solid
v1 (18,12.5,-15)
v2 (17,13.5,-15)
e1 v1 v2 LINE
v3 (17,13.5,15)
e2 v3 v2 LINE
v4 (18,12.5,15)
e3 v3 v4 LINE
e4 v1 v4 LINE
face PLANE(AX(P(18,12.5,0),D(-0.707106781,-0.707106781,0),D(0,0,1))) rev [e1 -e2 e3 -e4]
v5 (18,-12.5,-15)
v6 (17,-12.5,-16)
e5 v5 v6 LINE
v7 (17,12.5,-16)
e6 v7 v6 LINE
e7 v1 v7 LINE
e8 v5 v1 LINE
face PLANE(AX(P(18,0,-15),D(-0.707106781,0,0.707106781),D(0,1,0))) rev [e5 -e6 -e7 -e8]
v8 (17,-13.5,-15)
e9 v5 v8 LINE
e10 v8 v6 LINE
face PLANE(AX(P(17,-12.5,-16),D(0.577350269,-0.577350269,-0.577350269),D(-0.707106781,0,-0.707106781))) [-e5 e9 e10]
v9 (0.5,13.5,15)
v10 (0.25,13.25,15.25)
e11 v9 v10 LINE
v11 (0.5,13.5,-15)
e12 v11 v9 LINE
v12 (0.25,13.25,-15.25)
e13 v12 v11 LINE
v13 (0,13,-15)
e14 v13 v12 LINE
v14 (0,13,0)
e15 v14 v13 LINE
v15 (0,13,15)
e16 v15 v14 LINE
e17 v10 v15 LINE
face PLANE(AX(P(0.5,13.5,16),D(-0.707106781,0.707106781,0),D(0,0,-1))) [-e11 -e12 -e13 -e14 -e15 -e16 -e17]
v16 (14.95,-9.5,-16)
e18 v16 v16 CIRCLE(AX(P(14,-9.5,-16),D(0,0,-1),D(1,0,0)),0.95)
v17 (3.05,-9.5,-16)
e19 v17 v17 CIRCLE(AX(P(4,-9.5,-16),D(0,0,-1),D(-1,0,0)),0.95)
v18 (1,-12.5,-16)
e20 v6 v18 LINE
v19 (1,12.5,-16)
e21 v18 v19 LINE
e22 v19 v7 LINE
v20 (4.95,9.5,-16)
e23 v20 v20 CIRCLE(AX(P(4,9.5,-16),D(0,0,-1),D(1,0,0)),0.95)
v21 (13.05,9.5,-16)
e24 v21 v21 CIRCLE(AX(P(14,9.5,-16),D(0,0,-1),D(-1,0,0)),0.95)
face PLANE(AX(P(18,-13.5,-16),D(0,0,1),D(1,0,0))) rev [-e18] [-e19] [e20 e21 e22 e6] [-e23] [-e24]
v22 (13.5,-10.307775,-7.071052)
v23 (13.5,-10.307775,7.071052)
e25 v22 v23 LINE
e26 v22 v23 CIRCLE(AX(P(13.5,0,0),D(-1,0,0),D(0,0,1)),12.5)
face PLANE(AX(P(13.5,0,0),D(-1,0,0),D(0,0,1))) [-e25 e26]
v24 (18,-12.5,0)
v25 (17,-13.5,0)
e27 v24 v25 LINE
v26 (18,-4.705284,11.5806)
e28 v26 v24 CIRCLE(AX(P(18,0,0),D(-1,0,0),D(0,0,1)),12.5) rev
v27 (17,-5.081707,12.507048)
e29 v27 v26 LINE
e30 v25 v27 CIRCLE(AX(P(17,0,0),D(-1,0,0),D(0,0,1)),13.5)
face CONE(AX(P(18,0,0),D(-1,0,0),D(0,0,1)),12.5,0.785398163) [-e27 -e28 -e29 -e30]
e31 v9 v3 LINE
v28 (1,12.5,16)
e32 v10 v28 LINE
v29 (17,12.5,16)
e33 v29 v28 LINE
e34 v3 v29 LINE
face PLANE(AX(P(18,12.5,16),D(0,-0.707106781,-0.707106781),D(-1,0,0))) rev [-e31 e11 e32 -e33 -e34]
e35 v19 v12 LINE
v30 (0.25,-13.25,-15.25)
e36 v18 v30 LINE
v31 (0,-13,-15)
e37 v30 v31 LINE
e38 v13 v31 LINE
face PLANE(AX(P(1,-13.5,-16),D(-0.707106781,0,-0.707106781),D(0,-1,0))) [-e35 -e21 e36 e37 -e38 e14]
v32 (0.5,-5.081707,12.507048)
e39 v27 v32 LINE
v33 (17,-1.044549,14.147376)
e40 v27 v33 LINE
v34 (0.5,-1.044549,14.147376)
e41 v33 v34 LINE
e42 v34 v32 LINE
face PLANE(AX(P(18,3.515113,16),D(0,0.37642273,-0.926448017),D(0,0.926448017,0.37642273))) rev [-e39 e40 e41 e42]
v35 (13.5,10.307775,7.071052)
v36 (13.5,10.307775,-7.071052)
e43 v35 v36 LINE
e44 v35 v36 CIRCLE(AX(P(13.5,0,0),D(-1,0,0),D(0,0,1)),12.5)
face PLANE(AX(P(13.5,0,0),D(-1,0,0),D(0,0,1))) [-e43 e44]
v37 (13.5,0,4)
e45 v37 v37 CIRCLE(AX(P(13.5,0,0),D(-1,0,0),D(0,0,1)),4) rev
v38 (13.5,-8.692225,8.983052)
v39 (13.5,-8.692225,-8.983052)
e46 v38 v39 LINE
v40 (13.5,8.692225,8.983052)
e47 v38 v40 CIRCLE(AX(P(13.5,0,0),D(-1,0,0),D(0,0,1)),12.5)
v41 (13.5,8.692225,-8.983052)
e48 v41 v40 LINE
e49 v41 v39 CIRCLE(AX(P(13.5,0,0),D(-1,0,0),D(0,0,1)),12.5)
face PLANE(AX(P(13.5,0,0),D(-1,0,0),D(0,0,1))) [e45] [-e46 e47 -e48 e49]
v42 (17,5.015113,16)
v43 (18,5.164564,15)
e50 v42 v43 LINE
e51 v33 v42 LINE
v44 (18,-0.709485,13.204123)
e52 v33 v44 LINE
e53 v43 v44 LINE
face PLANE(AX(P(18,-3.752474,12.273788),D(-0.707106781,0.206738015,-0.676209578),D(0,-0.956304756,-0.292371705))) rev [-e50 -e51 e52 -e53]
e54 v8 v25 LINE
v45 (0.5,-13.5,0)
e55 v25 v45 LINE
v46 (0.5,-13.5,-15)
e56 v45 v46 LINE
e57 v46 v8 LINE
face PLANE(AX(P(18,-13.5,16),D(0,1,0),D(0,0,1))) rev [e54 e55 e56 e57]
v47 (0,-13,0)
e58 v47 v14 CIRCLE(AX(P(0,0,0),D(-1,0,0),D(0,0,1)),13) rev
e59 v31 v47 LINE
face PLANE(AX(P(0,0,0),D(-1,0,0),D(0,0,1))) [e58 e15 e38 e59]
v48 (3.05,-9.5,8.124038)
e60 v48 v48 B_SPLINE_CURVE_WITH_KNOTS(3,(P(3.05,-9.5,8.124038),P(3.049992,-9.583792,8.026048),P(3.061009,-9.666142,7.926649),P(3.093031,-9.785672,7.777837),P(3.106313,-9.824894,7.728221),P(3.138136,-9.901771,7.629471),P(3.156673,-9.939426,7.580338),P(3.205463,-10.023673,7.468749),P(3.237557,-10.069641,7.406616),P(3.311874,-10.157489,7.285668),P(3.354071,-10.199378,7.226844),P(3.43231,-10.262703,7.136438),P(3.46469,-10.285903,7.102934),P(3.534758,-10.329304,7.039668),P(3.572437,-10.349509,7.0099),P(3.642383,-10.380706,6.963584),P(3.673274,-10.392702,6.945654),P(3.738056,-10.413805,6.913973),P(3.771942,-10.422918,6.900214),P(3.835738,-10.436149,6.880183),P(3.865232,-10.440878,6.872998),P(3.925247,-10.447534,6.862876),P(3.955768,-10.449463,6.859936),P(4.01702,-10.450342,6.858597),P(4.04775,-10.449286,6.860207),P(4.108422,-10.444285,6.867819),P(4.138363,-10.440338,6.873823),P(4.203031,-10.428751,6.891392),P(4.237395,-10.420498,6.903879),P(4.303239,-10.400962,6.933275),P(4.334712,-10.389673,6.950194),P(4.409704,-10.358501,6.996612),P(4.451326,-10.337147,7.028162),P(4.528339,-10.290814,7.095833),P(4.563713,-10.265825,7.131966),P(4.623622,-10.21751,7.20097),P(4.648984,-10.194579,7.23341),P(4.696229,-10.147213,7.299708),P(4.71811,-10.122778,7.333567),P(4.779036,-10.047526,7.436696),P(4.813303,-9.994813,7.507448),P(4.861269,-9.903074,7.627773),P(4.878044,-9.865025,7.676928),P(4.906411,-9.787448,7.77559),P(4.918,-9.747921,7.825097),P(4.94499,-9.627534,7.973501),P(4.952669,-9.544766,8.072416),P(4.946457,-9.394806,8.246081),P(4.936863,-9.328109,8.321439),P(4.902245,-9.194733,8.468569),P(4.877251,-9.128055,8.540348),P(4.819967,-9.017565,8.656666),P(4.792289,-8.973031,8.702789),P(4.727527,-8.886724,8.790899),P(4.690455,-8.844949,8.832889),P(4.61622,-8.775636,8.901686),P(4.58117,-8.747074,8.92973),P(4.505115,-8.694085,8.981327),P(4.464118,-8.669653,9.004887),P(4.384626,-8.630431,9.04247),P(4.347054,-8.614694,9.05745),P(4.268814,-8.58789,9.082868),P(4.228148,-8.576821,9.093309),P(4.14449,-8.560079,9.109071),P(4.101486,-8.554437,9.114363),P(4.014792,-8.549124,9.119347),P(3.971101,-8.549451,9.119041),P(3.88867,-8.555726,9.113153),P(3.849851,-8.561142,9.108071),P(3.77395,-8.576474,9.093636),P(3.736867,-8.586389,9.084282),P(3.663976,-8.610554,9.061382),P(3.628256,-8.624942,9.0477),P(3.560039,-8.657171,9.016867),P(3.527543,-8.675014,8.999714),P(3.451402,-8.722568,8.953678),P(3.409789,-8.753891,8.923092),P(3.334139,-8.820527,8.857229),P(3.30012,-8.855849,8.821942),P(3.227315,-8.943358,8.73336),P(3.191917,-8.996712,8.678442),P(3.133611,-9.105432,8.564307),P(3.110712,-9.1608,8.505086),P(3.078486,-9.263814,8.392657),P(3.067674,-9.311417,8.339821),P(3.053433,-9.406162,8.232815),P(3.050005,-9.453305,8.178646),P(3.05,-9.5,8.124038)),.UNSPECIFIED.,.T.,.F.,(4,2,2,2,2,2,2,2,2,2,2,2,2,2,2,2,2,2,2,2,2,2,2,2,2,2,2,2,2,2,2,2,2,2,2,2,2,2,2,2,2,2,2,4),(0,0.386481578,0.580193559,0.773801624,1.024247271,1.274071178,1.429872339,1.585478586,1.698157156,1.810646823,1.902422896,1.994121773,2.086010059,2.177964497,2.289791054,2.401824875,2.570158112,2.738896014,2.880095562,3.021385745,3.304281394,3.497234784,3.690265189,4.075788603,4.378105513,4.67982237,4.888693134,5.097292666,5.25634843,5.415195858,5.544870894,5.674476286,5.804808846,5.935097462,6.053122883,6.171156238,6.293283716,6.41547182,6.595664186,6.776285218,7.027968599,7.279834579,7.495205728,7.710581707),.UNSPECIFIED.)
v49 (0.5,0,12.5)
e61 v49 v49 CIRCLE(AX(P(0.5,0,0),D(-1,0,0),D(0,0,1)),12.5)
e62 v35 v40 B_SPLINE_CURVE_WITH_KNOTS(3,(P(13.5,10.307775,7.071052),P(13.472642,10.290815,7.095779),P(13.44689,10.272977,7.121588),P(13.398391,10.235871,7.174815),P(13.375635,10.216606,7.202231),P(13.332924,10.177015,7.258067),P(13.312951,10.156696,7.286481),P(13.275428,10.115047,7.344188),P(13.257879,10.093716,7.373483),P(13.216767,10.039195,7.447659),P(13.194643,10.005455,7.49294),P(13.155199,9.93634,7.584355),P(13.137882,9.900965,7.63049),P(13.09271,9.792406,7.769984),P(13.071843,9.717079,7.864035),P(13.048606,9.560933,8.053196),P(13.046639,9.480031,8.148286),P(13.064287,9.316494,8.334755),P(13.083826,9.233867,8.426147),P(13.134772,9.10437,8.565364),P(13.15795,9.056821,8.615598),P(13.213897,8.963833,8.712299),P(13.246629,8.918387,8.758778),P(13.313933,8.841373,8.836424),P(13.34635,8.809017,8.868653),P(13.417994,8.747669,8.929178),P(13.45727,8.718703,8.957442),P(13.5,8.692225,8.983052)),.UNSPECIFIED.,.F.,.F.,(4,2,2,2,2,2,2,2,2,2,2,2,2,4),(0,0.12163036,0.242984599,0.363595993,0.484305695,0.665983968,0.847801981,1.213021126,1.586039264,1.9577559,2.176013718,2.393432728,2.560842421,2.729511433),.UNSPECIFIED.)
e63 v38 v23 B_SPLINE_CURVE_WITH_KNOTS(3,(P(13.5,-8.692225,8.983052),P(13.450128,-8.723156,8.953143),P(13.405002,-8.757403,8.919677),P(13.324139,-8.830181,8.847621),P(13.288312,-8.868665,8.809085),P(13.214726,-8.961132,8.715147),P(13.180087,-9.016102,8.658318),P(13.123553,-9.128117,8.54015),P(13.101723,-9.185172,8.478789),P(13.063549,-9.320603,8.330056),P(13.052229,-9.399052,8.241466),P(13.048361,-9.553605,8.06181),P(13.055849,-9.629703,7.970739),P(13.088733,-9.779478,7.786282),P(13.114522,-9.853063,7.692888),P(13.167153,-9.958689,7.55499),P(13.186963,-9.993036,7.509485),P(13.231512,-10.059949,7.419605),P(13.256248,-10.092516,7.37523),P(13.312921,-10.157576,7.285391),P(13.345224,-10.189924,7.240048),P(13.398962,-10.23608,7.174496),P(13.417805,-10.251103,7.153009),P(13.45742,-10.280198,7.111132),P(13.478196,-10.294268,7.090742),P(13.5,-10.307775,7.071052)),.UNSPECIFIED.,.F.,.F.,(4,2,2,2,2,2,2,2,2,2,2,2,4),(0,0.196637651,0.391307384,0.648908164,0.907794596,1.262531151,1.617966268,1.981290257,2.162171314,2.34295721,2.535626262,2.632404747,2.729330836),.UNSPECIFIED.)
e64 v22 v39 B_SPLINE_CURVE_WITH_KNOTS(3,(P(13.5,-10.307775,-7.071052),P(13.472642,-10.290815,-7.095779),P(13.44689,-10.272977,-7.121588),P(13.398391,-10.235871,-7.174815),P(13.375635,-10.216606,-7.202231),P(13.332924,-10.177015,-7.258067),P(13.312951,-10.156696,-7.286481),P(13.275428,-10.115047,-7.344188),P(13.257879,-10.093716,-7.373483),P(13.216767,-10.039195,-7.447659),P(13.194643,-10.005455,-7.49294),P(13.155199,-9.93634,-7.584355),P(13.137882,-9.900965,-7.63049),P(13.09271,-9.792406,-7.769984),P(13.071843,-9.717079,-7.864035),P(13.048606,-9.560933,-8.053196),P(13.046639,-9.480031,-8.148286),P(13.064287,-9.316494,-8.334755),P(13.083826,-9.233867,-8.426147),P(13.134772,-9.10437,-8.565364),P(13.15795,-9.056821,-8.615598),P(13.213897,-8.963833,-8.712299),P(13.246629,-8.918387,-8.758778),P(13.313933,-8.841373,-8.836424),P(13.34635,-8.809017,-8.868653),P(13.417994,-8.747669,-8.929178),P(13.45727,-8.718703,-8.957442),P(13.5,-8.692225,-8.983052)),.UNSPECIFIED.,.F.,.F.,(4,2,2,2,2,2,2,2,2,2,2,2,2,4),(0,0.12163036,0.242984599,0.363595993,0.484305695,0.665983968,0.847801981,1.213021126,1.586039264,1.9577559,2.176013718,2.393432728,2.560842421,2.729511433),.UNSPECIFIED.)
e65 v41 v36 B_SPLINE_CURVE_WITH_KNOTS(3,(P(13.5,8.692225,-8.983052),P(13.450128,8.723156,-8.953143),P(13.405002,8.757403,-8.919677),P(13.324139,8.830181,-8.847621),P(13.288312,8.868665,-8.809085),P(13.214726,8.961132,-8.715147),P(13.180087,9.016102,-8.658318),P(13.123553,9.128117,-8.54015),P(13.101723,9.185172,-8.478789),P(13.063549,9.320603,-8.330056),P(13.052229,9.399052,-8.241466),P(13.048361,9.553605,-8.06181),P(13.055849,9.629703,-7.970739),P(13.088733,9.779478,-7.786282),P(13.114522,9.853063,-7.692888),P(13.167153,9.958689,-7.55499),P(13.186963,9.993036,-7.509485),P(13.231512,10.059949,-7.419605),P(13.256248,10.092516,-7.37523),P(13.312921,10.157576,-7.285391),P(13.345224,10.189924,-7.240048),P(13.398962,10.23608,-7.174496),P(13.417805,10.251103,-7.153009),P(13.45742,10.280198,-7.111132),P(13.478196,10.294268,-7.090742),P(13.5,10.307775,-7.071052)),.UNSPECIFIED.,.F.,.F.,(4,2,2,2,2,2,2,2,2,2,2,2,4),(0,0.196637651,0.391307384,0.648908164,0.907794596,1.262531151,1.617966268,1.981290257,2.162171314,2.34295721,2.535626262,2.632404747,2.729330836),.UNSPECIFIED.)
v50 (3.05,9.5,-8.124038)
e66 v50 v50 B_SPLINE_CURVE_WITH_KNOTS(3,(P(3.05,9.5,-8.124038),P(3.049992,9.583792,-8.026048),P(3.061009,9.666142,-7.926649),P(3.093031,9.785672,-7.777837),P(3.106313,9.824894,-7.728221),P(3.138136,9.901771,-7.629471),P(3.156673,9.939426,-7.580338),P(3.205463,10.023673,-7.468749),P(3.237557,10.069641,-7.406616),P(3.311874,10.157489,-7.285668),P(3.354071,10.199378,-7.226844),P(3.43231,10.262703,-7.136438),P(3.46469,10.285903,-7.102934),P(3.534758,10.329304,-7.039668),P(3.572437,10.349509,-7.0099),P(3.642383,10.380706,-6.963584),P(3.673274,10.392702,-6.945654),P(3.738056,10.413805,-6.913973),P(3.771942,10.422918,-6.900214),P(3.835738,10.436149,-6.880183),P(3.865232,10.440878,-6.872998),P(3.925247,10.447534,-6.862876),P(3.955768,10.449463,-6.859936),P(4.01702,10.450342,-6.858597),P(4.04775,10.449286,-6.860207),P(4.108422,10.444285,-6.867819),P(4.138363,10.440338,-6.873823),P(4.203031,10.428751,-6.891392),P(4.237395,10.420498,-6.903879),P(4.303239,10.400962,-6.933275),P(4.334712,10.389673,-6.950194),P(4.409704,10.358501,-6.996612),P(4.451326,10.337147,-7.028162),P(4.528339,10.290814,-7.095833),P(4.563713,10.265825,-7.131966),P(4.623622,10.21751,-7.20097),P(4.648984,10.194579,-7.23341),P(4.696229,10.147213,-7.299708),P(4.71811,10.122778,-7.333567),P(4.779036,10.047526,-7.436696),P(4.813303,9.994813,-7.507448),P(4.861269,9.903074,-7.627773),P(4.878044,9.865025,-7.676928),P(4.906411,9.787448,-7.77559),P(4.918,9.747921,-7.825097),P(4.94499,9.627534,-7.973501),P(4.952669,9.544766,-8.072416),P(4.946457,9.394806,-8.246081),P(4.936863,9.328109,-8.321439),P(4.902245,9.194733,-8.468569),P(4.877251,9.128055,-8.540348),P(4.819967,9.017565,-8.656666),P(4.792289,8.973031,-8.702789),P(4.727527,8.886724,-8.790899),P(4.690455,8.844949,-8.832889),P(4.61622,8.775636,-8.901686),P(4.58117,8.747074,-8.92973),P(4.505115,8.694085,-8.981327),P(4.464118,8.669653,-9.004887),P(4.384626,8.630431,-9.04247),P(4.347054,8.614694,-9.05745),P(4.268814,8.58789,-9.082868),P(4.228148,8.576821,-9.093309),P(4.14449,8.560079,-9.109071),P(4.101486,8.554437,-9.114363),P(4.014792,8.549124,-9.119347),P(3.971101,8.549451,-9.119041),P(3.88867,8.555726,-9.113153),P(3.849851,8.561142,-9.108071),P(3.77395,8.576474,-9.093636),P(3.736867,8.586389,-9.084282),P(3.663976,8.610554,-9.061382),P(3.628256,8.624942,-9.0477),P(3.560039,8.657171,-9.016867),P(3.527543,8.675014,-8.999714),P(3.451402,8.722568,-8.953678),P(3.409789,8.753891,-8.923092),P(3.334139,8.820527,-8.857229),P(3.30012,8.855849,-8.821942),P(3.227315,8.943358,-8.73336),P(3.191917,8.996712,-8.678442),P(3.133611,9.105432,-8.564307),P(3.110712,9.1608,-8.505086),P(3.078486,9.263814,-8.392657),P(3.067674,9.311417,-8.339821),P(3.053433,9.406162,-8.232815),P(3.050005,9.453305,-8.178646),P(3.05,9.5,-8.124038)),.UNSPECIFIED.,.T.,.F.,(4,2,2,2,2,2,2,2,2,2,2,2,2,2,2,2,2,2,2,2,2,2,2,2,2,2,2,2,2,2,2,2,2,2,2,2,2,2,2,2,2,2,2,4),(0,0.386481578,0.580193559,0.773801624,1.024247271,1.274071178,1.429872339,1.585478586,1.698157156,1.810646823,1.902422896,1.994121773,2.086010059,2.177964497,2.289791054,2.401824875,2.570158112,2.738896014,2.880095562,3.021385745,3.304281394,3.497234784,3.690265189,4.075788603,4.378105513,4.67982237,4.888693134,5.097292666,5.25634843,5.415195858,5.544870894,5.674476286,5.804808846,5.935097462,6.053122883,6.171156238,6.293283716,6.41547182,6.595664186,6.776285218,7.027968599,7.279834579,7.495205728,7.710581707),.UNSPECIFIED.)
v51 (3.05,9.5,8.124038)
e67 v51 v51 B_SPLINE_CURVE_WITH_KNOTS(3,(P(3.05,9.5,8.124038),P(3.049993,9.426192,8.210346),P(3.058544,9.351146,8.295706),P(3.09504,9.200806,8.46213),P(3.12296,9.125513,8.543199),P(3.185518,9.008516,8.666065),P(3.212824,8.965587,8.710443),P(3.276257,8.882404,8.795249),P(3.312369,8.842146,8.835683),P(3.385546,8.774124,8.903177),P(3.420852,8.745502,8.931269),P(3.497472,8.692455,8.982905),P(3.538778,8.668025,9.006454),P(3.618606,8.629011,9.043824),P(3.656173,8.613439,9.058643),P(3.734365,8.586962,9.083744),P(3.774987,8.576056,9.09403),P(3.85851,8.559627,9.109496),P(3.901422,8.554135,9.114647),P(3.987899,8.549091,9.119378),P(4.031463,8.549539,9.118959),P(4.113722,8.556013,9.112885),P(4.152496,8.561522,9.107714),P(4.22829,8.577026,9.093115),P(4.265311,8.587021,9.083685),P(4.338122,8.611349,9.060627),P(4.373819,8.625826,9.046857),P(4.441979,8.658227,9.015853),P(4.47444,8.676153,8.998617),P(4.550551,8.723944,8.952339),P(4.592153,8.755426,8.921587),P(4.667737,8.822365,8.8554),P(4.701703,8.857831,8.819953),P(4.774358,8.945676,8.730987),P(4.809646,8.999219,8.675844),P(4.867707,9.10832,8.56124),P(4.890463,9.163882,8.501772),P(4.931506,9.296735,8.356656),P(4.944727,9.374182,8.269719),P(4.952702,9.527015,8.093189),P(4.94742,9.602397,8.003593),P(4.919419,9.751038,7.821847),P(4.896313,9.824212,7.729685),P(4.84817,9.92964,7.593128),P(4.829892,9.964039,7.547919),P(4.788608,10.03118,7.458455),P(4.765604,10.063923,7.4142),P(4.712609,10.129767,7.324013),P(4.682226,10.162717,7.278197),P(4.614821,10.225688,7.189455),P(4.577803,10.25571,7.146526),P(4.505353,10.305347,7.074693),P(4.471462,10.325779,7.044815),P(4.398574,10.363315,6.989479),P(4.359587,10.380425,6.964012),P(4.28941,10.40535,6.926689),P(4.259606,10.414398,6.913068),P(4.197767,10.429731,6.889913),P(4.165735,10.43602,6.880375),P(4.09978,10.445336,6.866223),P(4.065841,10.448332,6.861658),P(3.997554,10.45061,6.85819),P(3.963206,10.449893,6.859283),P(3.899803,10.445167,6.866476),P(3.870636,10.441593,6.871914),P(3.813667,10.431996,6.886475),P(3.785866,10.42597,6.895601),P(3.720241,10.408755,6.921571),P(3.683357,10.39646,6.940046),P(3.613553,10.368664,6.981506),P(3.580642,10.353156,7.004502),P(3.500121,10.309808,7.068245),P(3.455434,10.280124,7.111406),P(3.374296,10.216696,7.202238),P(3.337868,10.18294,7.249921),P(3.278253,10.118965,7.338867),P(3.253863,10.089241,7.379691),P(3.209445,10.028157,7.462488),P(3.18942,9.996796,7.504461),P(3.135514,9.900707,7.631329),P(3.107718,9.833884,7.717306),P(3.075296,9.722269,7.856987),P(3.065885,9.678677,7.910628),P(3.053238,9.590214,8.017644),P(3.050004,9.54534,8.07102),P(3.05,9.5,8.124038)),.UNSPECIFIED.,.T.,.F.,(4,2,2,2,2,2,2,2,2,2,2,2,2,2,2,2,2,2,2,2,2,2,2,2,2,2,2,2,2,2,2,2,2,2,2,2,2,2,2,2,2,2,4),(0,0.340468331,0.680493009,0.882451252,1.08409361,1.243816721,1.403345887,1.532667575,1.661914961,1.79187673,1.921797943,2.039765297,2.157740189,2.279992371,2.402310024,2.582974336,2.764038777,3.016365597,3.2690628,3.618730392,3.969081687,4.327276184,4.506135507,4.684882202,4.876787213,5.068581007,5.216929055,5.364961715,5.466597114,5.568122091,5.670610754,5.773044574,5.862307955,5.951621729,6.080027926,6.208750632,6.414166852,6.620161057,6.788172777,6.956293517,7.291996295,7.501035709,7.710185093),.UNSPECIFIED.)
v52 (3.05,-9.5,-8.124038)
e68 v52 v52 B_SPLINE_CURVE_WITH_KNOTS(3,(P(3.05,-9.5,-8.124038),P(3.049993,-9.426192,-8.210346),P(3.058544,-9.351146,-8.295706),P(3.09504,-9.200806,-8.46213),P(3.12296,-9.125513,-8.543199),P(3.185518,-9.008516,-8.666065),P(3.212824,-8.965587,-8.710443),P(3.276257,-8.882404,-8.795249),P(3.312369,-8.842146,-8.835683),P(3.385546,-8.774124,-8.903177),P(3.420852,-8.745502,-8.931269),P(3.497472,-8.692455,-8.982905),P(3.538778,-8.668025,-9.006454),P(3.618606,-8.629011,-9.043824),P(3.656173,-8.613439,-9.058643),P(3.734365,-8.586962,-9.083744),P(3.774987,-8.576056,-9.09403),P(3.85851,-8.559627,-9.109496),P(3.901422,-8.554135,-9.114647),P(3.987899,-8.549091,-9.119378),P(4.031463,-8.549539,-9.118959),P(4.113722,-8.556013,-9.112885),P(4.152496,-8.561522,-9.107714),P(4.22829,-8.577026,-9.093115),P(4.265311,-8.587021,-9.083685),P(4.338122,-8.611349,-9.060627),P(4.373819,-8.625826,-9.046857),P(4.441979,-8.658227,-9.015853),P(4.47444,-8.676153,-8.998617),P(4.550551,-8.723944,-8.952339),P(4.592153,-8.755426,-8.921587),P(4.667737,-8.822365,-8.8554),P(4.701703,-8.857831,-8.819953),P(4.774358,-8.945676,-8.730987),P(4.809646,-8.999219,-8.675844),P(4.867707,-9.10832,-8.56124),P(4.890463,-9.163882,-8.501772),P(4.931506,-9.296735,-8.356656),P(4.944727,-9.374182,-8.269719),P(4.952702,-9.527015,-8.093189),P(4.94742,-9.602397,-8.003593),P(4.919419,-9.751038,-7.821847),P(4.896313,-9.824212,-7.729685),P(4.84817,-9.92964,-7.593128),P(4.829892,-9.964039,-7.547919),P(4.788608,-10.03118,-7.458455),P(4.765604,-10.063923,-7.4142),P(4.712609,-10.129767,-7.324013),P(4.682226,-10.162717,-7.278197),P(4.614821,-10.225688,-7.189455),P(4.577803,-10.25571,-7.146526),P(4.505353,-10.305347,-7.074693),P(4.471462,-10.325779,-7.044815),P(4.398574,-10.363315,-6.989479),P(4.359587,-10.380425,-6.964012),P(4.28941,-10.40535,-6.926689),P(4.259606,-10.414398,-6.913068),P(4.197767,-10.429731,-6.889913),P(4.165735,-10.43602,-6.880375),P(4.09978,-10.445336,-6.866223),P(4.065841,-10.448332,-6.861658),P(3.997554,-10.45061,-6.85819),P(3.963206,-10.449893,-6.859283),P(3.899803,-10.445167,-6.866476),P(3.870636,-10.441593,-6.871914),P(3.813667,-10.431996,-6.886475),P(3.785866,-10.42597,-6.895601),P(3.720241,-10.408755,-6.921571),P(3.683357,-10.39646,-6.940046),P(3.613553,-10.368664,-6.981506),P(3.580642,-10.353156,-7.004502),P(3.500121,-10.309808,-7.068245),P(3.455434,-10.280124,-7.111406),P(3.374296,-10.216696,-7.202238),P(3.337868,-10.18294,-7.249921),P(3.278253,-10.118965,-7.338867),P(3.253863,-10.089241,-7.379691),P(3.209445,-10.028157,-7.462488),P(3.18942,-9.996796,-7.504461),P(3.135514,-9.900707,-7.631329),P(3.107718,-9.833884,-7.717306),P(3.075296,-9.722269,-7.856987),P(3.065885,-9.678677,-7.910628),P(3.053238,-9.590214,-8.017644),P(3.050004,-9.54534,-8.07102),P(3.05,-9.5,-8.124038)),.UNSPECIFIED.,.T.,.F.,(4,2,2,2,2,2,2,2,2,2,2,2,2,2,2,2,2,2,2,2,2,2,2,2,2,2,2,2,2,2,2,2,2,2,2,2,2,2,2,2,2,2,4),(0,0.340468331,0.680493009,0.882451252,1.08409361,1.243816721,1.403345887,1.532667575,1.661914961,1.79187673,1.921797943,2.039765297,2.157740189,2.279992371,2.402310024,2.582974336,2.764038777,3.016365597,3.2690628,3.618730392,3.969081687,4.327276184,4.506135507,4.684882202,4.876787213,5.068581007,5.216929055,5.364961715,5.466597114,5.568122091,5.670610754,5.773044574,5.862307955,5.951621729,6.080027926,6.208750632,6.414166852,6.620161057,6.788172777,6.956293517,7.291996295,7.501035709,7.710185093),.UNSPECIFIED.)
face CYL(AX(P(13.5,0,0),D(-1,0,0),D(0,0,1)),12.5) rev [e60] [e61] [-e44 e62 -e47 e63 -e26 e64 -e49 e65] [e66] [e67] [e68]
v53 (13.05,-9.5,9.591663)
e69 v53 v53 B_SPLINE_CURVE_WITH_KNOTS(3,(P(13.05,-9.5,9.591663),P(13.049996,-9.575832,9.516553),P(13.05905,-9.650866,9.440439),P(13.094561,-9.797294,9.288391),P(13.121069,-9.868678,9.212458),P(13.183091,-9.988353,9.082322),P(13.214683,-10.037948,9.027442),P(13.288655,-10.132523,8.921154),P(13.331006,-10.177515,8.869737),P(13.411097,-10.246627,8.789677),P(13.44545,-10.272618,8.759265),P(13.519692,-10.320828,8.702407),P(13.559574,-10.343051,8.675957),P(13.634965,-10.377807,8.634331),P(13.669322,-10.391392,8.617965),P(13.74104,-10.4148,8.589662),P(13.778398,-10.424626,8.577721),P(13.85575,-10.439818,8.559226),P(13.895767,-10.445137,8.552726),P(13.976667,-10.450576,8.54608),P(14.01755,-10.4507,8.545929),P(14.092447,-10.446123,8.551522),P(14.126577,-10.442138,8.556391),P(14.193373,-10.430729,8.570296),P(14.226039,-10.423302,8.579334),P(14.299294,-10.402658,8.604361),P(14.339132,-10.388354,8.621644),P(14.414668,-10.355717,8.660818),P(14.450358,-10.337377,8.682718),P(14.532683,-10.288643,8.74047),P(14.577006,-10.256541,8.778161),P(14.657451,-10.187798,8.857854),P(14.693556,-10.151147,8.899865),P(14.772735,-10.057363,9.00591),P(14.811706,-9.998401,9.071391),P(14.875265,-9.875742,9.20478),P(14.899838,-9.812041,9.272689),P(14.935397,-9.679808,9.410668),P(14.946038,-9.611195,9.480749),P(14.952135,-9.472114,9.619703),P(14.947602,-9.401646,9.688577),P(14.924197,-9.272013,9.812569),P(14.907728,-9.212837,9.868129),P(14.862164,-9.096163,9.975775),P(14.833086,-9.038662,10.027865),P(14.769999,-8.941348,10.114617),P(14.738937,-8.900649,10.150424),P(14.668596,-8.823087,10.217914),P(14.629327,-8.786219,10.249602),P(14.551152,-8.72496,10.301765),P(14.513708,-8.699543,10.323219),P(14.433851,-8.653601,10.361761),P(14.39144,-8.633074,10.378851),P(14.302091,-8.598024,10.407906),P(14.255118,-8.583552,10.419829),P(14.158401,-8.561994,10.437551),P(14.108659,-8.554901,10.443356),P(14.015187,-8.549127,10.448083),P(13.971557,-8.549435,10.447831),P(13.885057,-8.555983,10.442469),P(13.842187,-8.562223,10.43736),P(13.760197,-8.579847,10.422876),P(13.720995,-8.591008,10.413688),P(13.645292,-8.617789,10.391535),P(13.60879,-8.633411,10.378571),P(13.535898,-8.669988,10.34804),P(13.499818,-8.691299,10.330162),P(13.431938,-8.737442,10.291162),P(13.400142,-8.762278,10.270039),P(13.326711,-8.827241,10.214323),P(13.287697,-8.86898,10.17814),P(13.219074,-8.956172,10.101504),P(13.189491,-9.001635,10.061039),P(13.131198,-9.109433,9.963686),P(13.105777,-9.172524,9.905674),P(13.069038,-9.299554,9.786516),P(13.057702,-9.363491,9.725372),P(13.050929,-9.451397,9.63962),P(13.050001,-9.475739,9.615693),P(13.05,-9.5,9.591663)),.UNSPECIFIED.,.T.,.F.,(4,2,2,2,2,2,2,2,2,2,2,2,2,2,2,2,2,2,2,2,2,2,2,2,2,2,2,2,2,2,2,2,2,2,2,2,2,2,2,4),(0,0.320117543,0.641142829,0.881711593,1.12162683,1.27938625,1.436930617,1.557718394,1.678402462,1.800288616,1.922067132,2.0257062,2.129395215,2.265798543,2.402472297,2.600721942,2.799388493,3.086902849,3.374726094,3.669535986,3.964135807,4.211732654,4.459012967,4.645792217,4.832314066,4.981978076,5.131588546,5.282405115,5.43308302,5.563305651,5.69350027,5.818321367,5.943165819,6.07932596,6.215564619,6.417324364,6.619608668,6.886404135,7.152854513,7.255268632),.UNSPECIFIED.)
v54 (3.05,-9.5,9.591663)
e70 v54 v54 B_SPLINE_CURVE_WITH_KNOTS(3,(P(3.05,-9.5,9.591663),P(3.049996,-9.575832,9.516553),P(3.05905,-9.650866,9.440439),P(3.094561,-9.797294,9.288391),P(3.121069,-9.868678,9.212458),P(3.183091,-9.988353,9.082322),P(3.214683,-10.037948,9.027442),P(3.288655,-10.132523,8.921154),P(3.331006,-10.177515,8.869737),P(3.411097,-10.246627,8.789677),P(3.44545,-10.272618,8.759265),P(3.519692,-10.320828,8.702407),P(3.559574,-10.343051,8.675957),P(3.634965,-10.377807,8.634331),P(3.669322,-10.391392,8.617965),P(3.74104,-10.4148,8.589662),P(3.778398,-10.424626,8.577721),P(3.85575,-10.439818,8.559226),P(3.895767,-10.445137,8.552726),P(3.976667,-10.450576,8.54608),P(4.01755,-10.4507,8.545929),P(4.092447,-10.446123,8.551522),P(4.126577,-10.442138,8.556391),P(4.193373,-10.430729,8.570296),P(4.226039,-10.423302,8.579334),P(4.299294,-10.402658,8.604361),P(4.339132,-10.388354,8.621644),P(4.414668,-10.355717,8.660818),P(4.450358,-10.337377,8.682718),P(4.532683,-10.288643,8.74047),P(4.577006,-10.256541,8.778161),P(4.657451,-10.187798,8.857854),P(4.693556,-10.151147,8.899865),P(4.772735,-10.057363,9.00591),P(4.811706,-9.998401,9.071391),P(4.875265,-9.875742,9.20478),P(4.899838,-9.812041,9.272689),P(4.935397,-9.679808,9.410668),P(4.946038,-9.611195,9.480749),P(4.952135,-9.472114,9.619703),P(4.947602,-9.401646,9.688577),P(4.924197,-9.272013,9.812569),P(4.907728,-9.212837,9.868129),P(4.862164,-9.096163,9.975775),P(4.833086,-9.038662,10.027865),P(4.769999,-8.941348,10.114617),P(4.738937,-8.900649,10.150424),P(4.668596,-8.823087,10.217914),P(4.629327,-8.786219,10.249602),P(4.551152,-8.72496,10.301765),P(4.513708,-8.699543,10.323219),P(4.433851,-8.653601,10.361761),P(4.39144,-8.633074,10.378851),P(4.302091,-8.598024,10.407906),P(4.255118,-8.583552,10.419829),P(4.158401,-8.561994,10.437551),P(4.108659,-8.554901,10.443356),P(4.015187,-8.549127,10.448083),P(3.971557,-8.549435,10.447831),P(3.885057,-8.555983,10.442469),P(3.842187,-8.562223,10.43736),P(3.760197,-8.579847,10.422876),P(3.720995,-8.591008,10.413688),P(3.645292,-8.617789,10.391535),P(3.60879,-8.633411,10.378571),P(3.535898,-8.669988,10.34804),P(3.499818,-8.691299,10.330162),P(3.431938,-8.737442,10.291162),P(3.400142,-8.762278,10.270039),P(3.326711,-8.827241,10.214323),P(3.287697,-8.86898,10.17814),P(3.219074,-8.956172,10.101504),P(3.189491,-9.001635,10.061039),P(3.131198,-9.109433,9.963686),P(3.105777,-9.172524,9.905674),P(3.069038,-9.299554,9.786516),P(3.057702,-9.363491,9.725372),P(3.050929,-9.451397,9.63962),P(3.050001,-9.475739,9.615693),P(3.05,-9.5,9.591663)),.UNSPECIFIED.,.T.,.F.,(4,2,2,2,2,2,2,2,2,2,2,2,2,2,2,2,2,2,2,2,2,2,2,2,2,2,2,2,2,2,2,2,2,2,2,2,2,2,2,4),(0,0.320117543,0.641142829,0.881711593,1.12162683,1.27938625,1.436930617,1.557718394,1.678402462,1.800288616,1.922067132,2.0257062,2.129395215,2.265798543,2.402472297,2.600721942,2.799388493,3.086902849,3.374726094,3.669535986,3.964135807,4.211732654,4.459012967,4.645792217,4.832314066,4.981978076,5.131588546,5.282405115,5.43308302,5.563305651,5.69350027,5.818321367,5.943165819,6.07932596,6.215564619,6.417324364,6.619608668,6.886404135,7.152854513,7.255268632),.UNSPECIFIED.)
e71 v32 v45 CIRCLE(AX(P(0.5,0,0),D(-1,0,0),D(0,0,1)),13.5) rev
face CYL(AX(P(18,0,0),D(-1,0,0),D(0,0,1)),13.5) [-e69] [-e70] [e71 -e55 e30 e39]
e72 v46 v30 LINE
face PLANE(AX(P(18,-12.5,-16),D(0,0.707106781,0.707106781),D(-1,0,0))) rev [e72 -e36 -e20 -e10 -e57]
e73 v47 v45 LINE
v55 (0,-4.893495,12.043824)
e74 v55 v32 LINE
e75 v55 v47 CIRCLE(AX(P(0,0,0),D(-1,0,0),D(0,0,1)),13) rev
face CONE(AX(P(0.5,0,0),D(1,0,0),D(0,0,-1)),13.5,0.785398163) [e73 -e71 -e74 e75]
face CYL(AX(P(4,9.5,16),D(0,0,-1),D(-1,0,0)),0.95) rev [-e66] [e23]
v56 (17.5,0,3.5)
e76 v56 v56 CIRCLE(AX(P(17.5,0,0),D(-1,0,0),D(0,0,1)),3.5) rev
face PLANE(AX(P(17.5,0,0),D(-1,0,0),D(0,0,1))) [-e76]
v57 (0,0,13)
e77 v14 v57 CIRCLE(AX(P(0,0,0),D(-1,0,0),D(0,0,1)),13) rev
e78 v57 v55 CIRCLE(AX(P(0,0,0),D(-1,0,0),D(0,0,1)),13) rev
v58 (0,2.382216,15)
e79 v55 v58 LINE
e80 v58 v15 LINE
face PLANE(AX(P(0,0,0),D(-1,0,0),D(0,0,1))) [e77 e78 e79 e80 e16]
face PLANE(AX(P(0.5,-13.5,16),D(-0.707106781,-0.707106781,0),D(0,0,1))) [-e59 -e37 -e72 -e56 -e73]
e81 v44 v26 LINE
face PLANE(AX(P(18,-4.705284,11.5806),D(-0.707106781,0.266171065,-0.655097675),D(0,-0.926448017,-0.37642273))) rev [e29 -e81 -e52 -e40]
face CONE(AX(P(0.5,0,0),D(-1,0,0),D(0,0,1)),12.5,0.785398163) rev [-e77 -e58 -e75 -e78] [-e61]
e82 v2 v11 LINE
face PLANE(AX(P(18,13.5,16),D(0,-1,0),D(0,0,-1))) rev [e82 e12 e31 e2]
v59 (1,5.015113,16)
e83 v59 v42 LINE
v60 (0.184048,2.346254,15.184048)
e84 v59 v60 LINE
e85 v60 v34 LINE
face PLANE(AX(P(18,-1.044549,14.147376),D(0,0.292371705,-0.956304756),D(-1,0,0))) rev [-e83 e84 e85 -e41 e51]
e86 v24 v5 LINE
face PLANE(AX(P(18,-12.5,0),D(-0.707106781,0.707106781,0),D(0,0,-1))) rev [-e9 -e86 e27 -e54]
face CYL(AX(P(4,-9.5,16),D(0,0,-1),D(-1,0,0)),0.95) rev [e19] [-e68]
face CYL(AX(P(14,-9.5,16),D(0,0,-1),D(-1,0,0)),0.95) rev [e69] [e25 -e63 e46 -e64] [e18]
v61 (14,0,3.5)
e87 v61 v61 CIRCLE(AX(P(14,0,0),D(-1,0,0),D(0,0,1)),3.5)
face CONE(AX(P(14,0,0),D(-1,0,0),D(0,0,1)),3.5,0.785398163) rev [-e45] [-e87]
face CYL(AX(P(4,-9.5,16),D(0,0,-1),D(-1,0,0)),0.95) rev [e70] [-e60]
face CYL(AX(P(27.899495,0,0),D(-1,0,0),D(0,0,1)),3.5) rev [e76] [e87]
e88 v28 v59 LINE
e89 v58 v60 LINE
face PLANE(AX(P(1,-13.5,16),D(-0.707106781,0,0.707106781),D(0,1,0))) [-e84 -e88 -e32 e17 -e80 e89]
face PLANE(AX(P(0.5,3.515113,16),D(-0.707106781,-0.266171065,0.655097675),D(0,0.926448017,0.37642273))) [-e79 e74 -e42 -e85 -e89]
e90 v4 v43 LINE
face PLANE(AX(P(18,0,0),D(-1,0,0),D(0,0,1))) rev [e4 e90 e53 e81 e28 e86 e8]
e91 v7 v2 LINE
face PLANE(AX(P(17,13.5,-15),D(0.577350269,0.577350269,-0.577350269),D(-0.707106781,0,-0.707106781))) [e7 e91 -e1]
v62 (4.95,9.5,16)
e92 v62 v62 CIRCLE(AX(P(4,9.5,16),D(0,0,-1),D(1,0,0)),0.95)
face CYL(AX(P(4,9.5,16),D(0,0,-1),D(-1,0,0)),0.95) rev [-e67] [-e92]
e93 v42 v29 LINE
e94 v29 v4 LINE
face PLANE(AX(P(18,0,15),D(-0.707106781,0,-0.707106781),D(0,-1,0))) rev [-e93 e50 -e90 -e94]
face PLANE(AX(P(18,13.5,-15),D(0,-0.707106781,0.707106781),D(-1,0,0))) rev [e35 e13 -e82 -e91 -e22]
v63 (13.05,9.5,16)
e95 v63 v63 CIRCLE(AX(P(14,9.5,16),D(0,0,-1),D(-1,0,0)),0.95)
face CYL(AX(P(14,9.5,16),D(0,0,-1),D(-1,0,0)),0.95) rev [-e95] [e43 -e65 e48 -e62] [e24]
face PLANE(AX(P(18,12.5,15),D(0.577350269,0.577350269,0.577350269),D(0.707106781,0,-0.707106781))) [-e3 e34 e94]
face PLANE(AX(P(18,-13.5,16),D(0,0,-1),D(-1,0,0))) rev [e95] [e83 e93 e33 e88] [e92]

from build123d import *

# Parameters (mm, degrees)
SKETCH_1_W          = 32
SKETCH_1_H          = 27
EXTRUDE_1_DEPTH     = 18
SKETCH_2_R          = 12.5
CUT_EXTRUDE_1_DEPTH = 13.5
SKETCH_3_R          = 3.5
CUT_EXTRUDE_2_DEPTH = 4
SKETCH_4_R          = 0.95
CUT_EXTRUDE_3_DEPTH = 40.118409988
CUT_EXTRUDE_4_DEPTH = 28.608875443
CHAMFER_2_SIZE      = 1.5
CHAMFER_2_SIZE2     = 4.921659428
CHAMFER_4_SIZE      = 0.5


with BuildPart() as part:
    # 草图1 → 凸台-拉伸1 (new body)
    with BuildSketch(Plane(origin=(0, 0, 0), x_dir=(0, 0, -1), z_dir=(1, 0, 0))):
        Rectangle(SKETCH_1_W, SKETCH_1_H)
    extrude(amount=EXTRUDE_1_DEPTH)

    # 草图2 → 切除-拉伸1 (cut)
    with BuildSketch(Plane.ZY):
        Circle(SKETCH_2_R)
    extrude(amount=-CUT_EXTRUDE_1_DEPTH, mode=Mode.SUBTRACT)

    # 草图3 → 切除-拉伸2 (cut)
    with BuildSketch(Plane.ZY.offset(-13.5)):
        Circle(SKETCH_3_R)
    extrude(amount=-CUT_EXTRUDE_2_DEPTH, mode=Mode.SUBTRACT)

    # 草图4 → 切除-拉伸3 (cut, through all)
    with BuildSketch(Plane(origin=(0, 0, -16), x_dir=(-1, 0, 0), z_dir=(0, 0, -1))):
        with Locations((-14, 9.5)):
            Circle(SKETCH_4_R)
        with Locations((-4, 9.5)):
            Circle(SKETCH_4_R)
        with Locations((-4, -9.5)):
            Circle(SKETCH_4_R)
        with Locations(Location((-14, -9.5, 0), (0, 0, 180))):
            Circle(SKETCH_4_R)
    extrude(amount=-CUT_EXTRUDE_3_DEPTH, mode=Mode.SUBTRACT)

    # 草图6 → 切除-拉伸4 (cut, through all)
    with BuildSketch(Plane.ZY):
        with BuildLine():
            Line((16, -13.5), (16, 3.515112589))
            Line((16, 3.515112589), (12.507048233, -5.08170685))
            ThreePointArc((12.507048233, -5.08170685), (7.538134966, -11.199398253), (0, -13.5))
            Line((0, -13.5), (16, -13.5))
        make_face()
    extrude(amount=-CUT_EXTRUDE_4_DEPTH, mode=Mode.SUBTRACT)

    # 倒角2
    chamfer_2_edges = [part.edges().sort_by_distance(p)[0] for p in [
        (9, 3.515112589, 16),
    ]]
    chamfer_2_side = [part.faces().sort_by_distance(p)[0] for p in [
        (9, 8.475223706, 16),
    ]]
    chamfer(chamfer_2_edges, length=CHAMFER_2_SIZE, length2=CHAMFER_2_SIZE2, reference=chamfer_2_side[0])

    # 倒角3
    # the kernel refuses this chamfer: 1 mm, written as the material it takes off along each edge
    with BuildSketch(Plane(origin=(17.333333333, 12.833333333, 15.333333333), x_dir=(-0.7071067811865475, 0, 0.7071067811865475), z_dir=(0.5773502691896258, 0.5773502691896258, 0.5773502691896258)), Plane(origin=(17.333333333, 12.833333333, -15.333333333), x_dir=(-0.7071067811865475, 0.7071067811865475, 0), z_dir=(0.5773502691896258, 0.5773502691896258, -0.5773502691896258))) as chamfer_3_piece_1:
        Polygon((-0.707106781, 0.40824829), (0.707106781, 0.40824829), (0, -0.816496581), align=None)
    extrude(amount=1.270170592, mode=Mode.SUBTRACT)
    with BuildSketch(Plane(origin=(17.333333333, -12.833333333, -15.333333333), x_dir=(-0.7071067811865475, -0.7071067811865475, 0), z_dir=(0.5773502691896258, -0.5773502691896258, -0.5773502691896258))) as chamfer_3_piece_2:
        Polygon((-0.707106781, -0.40824829), (0.707106781, -0.40824829), (0, 0.816496581), align=None)
    extrude(amount=1.270170592, mode=Mode.SUBTRACT)
    with BuildSketch(Plane(origin=(18, 16.071682988, 16), x_dir=(-1, 0, 0), z_dir=(0, -1, 0)), Plane(origin=(0, 16.071682988, 16), x_dir=(0, 0, -1), z_dir=(0, -1, 0))) as chamfer_3_piece_3:
        with BuildLine():
            Line((1.028284271, -0.028284271), (-0.028284271, 1.028284271))
            Line((-0.028284271, 1.028284271), (-0.048284271, 1.028284271))
            ThreePointArc((-0.048284271, 1.028284271), (-0.02, 0.514142136), (-0.02, 0))
            Line((-0.02, 0), (0, -0.02))
            ThreePointArc((0, -0.02), (0.514142136, -0.02), (1.028284271, -0.048284271))
            Line((1.028284271, -0.048284271), (1.028284271, -0.028284271))
        make_face()
    extrude(amount=15.428431478, mode=Mode.SUBTRACT)
    with BuildSketch(Plane(origin=(18, -16.071682988, -16), x_dir=(-1, 0, 0), z_dir=(0, 1, 0)), Plane(origin=(0, -16.071682988, -16), x_dir=(0, 0, 1), z_dir=(0, 1, 0))) as chamfer_3_piece_4:
        with BuildLine():
            Line((1.028284271, -0.028284271), (-0.028284271, 1.028284271))
            Line((-0.028284271, 1.028284271), (-0.048284271, 1.028284271))
            ThreePointArc((-0.048284271, 1.028284271), (-0.02, 0.514142136), (-0.02, 0))
            Line((-0.02, 0), (0, -0.02))
            ThreePointArc((0, -0.02), (0.514142136, -0.02), (1.028284271, -0.048284271))
            Line((1.028284271, -0.048284271), (1.028284271, -0.028284271))
        make_face()
    extrude(amount=32.143365976, mode=Mode.SUBTRACT)
    with BuildSketch(Plane(origin=(18, -13.5, 0), x_dir=(-1, 0, 0), z_dir=(0, 0, -1))) as chamfer_3_piece_5:
        with BuildLine():
            Line((1.028284271, -0.028284271), (-0.028284271, 1.028284271))
            Line((-0.028284271, 1.028284271), (-0.048284271, 1.028284271))
            ThreePointArc((-0.048284271, 1.028284271), (-0.02, 0.514142136), (-0.02, 0))
            Line((-0.02, 0), (0, -0.02))
            ThreePointArc((0, -0.02), (0.514142136, -0.02), (1.028284271, -0.048284271))
            Line((1.028284271, -0.048284271), (1.028284271, -0.028284271))
        make_face()
    extrude(amount=18.571682988, mode=Mode.SUBTRACT)
    with BuildSketch(Plane(origin=(18, 0, 0), x_dir=(0, -1, 0), z_dir=(0, 0, -1))) as chamfer_3_piece_6:
        with BuildLine():
            Line((13.528284271, 1.028284271), (12.471715729, -0.028284271))
            Line((12.471715729, -0.028284271), (12.471715729, -0.048284271))
            ThreePointArc((12.471715729, -0.048284271), (12.985857864, -0.02), (13.5, -0.02))
            Line((13.5, -0.02), (13.52, 0))
            ThreePointArc((13.52, 0), (13.52, 0.514142136), (13.548284271, 1.028284271))
            Line((13.548284271, 1.028284271), (13.528284271, 1.028284271))
        make_face()
    revolve(axis=Axis((18, 0, 0), (-1, 0, 0)), revolution_arc=67.887726461, mode=Mode.SUBTRACT)
    with BuildSketch(Plane(origin=(18, -5.08170685, 12.507048233), x_dir=(-1, 0, 0), z_dir=(0, 0.9264480172326814, 0.3764227296081273))) as chamfer_3_piece_7:
        with BuildLine():
            Line((1.028284271, 0.028284271), (-0.028284271, -1.028284271))
            Line((-0.028284271, -1.028284271), (-0.048284271, -1.028284271))
            ThreePointArc((-0.048284271, -1.028284271), (-0.02, -0.514142136), (-0.02, 0))
            Line((-0.02, 0), (0, 0.02))
            ThreePointArc((0, 0.02), (0.514142136, 0.02), (1.028284271, 0.048284271))
            Line((1.028284271, 0.048284271), (1.028284271, 0.028284271))
        make_face()
    extrude(amount=17.216088275, mode=Mode.SUBTRACT)
    with BuildSketch(Plane(origin=(18, 9.195944132, 17.278208477), x_dir=(-1, 0, 0), z_dir=(0, -0.9563047559630353, -0.2923717047227372))) as chamfer_3_piece_8:
        with BuildLine():
            Line((1.028284271, -0.028284271), (-0.028284271, 1.028284271))
            Line((-0.028284271, 1.028284271), (-0.048284271, 1.028284271))
            ThreePointArc((-0.048284271, 1.028284271), (-0.02, 0.514142136), (-0.02, 0))
            Line((-0.02, 0), (0, -0.02))
            ThreePointArc((0, -0.02), (0.514142136, -0.02), (1.028284271, -0.048284271))
            Line((1.028284271, -0.048284271), (1.028284271, -0.028284271))
        make_face()
    extrude(amount=23.566814221, mode=Mode.SUBTRACT)
    with BuildSketch(Plane(origin=(-2.571682988, -13.5, -16), x_dir=(0, 0, 1), z_dir=(1, 0, 0))) as chamfer_3_piece_9:
        with BuildLine():
            Line((1.028284271, 0.028284271), (-0.028284271, -1.028284271))
            Line((-0.028284271, -1.028284271), (-0.048284271, -1.028284271))
            ThreePointArc((-0.048284271, -1.028284271), (-0.02, -0.514142136), (-0.02, 0))
            Line((-0.02, 0), (0, 0.02))
            ThreePointArc((0, 0.02), (0.514142136, 0.02), (1.028284271, 0.048284271))
            Line((1.028284271, 0.048284271), (1.028284271, 0.028284271))
        make_face()
    extrude(amount=23.143365976, mode=Mode.SUBTRACT)
    with BuildSketch(Plane(origin=(-2.571682988, 13.5, 16), x_dir=(0, -1, 0), z_dir=(1, 0, 0)), Plane(origin=(-2.571682988, 13.5, -16), x_dir=(0, 0, 1), z_dir=(1, 0, 0))) as chamfer_3_piece_10:
        with BuildLine():
            Line((1.028284271, -0.028284271), (-0.028284271, 1.028284271))
            Line((-0.028284271, 1.028284271), (-0.048284271, 1.028284271))
            ThreePointArc((-0.048284271, 1.028284271), (-0.02, 0.514142136), (-0.02, 0))
            Line((-0.02, 0), (0, -0.02))
            ThreePointArc((0, -0.02), (0.514142136, -0.02), (1.028284271, -0.048284271))
            Line((1.028284271, -0.048284271), (1.028284271, -0.028284271))
        make_face()
    extrude(amount=23.143365976, mode=Mode.SUBTRACT)
    with BuildSketch(Plane(origin=(18, 13.5, -18.571682988), x_dir=(-1, 0, 0), z_dir=(0, 0, 1))) as chamfer_3_piece_11:
        with BuildLine():
            Line((1.028284271, -0.028284271), (-0.028284271, 1.028284271))
            Line((-0.028284271, 1.028284271), (-0.048284271, 1.028284271))
            ThreePointArc((-0.048284271, 1.028284271), (-0.02, 0.514142136), (-0.02, 0))
            Line((-0.02, 0), (0, -0.02))
            ThreePointArc((0, -0.02), (0.514142136, -0.02), (1.028284271, -0.048284271))
            Line((1.028284271, -0.048284271), (1.028284271, -0.028284271))
        make_face()
    extrude(amount=37.143365976, mode=Mode.SUBTRACT)

    # 倒角4
    # the kernel refuses this chamfer: 0.5 mm, written as the material it takes off along each edge
    with BuildSketch(Plane(origin=(0, 13.5, -16.285841494), x_dir=(0, -1, 0), z_dir=(0, 0, 1))) as chamfer_4_piece_1:
        Polygon((CHAMFER_4_SIZE, 0), (0, CHAMFER_4_SIZE), (0, 0), align=None)
    extrude(amount=32.571682988, mode=Mode.SUBTRACT)
    with BuildSketch(Plane(origin=(0, 4.911777484, 16.567475349), x_dir=(0, 0.3764227296081273, -0.9264480172326813), z_dir=(0, -0.9264480172326814, -0.3764227296081273))) as chamfer_4_piece_2:
        Polygon((CHAMFER_4_SIZE, 0), (0, CHAMFER_4_SIZE), (0, 0), align=None)
    extrude(amount=10.786880805, mode=Mode.SUBTRACT)
    with BuildSketch(Plane(origin=(0, 0, 0), x_dir=(0, -0.3764227296081274, 0.9264480172326813), z_dir=(0, 0.9264480172326813, 0.3764227296081274))) as chamfer_4_piece_3:
        Polygon((13.5 - CHAMFER_4_SIZE, 0), (13.5, CHAMFER_4_SIZE), (13.5, 0), align=None)
    revolve(axis=Axis((0, 0, 0), (1, 0, 0)), revolution_arc=67.887726461, mode=Mode.SUBTRACT)
    with BuildSketch(Plane(origin=(0, -13.5, 0), x_dir=(0, 1, 0), z_dir=(0, 0, -1))) as chamfer_4_piece_4:
        Polygon((CHAMFER_4_SIZE, 0), (0, CHAMFER_4_SIZE), (0, 0), align=None)
    extrude(amount=16.285841494, mode=Mode.SUBTRACT)
    with BuildSketch(Plane(origin=(0, 0, 0), x_dir=(0, 0, 1), z_dir=(0, -1, 0))) as chamfer_4_piece_5:
        Polygon((12.5 + CHAMFER_4_SIZE, 0), (12.5, -CHAMFER_4_SIZE), (12.5, 0), align=None)
    revolve(axis=Axis((0, 0, 0), (-1, 0, 0)), mode=Mode.SUBTRACT)
    with BuildSketch(Plane(origin=(13.5, 0, 0), x_dir=(0, 0, 1), z_dir=(0, -1, 0))) as chamfer_4_piece_6:
        Polygon((3.5 + CHAMFER_4_SIZE, 0), (3.5, -CHAMFER_4_SIZE), (3.5, 0), align=None)
    revolve(axis=Axis((13.5, 0, 0), (-1, 0, 0)), mode=Mode.SUBTRACT)


solid = part.part
